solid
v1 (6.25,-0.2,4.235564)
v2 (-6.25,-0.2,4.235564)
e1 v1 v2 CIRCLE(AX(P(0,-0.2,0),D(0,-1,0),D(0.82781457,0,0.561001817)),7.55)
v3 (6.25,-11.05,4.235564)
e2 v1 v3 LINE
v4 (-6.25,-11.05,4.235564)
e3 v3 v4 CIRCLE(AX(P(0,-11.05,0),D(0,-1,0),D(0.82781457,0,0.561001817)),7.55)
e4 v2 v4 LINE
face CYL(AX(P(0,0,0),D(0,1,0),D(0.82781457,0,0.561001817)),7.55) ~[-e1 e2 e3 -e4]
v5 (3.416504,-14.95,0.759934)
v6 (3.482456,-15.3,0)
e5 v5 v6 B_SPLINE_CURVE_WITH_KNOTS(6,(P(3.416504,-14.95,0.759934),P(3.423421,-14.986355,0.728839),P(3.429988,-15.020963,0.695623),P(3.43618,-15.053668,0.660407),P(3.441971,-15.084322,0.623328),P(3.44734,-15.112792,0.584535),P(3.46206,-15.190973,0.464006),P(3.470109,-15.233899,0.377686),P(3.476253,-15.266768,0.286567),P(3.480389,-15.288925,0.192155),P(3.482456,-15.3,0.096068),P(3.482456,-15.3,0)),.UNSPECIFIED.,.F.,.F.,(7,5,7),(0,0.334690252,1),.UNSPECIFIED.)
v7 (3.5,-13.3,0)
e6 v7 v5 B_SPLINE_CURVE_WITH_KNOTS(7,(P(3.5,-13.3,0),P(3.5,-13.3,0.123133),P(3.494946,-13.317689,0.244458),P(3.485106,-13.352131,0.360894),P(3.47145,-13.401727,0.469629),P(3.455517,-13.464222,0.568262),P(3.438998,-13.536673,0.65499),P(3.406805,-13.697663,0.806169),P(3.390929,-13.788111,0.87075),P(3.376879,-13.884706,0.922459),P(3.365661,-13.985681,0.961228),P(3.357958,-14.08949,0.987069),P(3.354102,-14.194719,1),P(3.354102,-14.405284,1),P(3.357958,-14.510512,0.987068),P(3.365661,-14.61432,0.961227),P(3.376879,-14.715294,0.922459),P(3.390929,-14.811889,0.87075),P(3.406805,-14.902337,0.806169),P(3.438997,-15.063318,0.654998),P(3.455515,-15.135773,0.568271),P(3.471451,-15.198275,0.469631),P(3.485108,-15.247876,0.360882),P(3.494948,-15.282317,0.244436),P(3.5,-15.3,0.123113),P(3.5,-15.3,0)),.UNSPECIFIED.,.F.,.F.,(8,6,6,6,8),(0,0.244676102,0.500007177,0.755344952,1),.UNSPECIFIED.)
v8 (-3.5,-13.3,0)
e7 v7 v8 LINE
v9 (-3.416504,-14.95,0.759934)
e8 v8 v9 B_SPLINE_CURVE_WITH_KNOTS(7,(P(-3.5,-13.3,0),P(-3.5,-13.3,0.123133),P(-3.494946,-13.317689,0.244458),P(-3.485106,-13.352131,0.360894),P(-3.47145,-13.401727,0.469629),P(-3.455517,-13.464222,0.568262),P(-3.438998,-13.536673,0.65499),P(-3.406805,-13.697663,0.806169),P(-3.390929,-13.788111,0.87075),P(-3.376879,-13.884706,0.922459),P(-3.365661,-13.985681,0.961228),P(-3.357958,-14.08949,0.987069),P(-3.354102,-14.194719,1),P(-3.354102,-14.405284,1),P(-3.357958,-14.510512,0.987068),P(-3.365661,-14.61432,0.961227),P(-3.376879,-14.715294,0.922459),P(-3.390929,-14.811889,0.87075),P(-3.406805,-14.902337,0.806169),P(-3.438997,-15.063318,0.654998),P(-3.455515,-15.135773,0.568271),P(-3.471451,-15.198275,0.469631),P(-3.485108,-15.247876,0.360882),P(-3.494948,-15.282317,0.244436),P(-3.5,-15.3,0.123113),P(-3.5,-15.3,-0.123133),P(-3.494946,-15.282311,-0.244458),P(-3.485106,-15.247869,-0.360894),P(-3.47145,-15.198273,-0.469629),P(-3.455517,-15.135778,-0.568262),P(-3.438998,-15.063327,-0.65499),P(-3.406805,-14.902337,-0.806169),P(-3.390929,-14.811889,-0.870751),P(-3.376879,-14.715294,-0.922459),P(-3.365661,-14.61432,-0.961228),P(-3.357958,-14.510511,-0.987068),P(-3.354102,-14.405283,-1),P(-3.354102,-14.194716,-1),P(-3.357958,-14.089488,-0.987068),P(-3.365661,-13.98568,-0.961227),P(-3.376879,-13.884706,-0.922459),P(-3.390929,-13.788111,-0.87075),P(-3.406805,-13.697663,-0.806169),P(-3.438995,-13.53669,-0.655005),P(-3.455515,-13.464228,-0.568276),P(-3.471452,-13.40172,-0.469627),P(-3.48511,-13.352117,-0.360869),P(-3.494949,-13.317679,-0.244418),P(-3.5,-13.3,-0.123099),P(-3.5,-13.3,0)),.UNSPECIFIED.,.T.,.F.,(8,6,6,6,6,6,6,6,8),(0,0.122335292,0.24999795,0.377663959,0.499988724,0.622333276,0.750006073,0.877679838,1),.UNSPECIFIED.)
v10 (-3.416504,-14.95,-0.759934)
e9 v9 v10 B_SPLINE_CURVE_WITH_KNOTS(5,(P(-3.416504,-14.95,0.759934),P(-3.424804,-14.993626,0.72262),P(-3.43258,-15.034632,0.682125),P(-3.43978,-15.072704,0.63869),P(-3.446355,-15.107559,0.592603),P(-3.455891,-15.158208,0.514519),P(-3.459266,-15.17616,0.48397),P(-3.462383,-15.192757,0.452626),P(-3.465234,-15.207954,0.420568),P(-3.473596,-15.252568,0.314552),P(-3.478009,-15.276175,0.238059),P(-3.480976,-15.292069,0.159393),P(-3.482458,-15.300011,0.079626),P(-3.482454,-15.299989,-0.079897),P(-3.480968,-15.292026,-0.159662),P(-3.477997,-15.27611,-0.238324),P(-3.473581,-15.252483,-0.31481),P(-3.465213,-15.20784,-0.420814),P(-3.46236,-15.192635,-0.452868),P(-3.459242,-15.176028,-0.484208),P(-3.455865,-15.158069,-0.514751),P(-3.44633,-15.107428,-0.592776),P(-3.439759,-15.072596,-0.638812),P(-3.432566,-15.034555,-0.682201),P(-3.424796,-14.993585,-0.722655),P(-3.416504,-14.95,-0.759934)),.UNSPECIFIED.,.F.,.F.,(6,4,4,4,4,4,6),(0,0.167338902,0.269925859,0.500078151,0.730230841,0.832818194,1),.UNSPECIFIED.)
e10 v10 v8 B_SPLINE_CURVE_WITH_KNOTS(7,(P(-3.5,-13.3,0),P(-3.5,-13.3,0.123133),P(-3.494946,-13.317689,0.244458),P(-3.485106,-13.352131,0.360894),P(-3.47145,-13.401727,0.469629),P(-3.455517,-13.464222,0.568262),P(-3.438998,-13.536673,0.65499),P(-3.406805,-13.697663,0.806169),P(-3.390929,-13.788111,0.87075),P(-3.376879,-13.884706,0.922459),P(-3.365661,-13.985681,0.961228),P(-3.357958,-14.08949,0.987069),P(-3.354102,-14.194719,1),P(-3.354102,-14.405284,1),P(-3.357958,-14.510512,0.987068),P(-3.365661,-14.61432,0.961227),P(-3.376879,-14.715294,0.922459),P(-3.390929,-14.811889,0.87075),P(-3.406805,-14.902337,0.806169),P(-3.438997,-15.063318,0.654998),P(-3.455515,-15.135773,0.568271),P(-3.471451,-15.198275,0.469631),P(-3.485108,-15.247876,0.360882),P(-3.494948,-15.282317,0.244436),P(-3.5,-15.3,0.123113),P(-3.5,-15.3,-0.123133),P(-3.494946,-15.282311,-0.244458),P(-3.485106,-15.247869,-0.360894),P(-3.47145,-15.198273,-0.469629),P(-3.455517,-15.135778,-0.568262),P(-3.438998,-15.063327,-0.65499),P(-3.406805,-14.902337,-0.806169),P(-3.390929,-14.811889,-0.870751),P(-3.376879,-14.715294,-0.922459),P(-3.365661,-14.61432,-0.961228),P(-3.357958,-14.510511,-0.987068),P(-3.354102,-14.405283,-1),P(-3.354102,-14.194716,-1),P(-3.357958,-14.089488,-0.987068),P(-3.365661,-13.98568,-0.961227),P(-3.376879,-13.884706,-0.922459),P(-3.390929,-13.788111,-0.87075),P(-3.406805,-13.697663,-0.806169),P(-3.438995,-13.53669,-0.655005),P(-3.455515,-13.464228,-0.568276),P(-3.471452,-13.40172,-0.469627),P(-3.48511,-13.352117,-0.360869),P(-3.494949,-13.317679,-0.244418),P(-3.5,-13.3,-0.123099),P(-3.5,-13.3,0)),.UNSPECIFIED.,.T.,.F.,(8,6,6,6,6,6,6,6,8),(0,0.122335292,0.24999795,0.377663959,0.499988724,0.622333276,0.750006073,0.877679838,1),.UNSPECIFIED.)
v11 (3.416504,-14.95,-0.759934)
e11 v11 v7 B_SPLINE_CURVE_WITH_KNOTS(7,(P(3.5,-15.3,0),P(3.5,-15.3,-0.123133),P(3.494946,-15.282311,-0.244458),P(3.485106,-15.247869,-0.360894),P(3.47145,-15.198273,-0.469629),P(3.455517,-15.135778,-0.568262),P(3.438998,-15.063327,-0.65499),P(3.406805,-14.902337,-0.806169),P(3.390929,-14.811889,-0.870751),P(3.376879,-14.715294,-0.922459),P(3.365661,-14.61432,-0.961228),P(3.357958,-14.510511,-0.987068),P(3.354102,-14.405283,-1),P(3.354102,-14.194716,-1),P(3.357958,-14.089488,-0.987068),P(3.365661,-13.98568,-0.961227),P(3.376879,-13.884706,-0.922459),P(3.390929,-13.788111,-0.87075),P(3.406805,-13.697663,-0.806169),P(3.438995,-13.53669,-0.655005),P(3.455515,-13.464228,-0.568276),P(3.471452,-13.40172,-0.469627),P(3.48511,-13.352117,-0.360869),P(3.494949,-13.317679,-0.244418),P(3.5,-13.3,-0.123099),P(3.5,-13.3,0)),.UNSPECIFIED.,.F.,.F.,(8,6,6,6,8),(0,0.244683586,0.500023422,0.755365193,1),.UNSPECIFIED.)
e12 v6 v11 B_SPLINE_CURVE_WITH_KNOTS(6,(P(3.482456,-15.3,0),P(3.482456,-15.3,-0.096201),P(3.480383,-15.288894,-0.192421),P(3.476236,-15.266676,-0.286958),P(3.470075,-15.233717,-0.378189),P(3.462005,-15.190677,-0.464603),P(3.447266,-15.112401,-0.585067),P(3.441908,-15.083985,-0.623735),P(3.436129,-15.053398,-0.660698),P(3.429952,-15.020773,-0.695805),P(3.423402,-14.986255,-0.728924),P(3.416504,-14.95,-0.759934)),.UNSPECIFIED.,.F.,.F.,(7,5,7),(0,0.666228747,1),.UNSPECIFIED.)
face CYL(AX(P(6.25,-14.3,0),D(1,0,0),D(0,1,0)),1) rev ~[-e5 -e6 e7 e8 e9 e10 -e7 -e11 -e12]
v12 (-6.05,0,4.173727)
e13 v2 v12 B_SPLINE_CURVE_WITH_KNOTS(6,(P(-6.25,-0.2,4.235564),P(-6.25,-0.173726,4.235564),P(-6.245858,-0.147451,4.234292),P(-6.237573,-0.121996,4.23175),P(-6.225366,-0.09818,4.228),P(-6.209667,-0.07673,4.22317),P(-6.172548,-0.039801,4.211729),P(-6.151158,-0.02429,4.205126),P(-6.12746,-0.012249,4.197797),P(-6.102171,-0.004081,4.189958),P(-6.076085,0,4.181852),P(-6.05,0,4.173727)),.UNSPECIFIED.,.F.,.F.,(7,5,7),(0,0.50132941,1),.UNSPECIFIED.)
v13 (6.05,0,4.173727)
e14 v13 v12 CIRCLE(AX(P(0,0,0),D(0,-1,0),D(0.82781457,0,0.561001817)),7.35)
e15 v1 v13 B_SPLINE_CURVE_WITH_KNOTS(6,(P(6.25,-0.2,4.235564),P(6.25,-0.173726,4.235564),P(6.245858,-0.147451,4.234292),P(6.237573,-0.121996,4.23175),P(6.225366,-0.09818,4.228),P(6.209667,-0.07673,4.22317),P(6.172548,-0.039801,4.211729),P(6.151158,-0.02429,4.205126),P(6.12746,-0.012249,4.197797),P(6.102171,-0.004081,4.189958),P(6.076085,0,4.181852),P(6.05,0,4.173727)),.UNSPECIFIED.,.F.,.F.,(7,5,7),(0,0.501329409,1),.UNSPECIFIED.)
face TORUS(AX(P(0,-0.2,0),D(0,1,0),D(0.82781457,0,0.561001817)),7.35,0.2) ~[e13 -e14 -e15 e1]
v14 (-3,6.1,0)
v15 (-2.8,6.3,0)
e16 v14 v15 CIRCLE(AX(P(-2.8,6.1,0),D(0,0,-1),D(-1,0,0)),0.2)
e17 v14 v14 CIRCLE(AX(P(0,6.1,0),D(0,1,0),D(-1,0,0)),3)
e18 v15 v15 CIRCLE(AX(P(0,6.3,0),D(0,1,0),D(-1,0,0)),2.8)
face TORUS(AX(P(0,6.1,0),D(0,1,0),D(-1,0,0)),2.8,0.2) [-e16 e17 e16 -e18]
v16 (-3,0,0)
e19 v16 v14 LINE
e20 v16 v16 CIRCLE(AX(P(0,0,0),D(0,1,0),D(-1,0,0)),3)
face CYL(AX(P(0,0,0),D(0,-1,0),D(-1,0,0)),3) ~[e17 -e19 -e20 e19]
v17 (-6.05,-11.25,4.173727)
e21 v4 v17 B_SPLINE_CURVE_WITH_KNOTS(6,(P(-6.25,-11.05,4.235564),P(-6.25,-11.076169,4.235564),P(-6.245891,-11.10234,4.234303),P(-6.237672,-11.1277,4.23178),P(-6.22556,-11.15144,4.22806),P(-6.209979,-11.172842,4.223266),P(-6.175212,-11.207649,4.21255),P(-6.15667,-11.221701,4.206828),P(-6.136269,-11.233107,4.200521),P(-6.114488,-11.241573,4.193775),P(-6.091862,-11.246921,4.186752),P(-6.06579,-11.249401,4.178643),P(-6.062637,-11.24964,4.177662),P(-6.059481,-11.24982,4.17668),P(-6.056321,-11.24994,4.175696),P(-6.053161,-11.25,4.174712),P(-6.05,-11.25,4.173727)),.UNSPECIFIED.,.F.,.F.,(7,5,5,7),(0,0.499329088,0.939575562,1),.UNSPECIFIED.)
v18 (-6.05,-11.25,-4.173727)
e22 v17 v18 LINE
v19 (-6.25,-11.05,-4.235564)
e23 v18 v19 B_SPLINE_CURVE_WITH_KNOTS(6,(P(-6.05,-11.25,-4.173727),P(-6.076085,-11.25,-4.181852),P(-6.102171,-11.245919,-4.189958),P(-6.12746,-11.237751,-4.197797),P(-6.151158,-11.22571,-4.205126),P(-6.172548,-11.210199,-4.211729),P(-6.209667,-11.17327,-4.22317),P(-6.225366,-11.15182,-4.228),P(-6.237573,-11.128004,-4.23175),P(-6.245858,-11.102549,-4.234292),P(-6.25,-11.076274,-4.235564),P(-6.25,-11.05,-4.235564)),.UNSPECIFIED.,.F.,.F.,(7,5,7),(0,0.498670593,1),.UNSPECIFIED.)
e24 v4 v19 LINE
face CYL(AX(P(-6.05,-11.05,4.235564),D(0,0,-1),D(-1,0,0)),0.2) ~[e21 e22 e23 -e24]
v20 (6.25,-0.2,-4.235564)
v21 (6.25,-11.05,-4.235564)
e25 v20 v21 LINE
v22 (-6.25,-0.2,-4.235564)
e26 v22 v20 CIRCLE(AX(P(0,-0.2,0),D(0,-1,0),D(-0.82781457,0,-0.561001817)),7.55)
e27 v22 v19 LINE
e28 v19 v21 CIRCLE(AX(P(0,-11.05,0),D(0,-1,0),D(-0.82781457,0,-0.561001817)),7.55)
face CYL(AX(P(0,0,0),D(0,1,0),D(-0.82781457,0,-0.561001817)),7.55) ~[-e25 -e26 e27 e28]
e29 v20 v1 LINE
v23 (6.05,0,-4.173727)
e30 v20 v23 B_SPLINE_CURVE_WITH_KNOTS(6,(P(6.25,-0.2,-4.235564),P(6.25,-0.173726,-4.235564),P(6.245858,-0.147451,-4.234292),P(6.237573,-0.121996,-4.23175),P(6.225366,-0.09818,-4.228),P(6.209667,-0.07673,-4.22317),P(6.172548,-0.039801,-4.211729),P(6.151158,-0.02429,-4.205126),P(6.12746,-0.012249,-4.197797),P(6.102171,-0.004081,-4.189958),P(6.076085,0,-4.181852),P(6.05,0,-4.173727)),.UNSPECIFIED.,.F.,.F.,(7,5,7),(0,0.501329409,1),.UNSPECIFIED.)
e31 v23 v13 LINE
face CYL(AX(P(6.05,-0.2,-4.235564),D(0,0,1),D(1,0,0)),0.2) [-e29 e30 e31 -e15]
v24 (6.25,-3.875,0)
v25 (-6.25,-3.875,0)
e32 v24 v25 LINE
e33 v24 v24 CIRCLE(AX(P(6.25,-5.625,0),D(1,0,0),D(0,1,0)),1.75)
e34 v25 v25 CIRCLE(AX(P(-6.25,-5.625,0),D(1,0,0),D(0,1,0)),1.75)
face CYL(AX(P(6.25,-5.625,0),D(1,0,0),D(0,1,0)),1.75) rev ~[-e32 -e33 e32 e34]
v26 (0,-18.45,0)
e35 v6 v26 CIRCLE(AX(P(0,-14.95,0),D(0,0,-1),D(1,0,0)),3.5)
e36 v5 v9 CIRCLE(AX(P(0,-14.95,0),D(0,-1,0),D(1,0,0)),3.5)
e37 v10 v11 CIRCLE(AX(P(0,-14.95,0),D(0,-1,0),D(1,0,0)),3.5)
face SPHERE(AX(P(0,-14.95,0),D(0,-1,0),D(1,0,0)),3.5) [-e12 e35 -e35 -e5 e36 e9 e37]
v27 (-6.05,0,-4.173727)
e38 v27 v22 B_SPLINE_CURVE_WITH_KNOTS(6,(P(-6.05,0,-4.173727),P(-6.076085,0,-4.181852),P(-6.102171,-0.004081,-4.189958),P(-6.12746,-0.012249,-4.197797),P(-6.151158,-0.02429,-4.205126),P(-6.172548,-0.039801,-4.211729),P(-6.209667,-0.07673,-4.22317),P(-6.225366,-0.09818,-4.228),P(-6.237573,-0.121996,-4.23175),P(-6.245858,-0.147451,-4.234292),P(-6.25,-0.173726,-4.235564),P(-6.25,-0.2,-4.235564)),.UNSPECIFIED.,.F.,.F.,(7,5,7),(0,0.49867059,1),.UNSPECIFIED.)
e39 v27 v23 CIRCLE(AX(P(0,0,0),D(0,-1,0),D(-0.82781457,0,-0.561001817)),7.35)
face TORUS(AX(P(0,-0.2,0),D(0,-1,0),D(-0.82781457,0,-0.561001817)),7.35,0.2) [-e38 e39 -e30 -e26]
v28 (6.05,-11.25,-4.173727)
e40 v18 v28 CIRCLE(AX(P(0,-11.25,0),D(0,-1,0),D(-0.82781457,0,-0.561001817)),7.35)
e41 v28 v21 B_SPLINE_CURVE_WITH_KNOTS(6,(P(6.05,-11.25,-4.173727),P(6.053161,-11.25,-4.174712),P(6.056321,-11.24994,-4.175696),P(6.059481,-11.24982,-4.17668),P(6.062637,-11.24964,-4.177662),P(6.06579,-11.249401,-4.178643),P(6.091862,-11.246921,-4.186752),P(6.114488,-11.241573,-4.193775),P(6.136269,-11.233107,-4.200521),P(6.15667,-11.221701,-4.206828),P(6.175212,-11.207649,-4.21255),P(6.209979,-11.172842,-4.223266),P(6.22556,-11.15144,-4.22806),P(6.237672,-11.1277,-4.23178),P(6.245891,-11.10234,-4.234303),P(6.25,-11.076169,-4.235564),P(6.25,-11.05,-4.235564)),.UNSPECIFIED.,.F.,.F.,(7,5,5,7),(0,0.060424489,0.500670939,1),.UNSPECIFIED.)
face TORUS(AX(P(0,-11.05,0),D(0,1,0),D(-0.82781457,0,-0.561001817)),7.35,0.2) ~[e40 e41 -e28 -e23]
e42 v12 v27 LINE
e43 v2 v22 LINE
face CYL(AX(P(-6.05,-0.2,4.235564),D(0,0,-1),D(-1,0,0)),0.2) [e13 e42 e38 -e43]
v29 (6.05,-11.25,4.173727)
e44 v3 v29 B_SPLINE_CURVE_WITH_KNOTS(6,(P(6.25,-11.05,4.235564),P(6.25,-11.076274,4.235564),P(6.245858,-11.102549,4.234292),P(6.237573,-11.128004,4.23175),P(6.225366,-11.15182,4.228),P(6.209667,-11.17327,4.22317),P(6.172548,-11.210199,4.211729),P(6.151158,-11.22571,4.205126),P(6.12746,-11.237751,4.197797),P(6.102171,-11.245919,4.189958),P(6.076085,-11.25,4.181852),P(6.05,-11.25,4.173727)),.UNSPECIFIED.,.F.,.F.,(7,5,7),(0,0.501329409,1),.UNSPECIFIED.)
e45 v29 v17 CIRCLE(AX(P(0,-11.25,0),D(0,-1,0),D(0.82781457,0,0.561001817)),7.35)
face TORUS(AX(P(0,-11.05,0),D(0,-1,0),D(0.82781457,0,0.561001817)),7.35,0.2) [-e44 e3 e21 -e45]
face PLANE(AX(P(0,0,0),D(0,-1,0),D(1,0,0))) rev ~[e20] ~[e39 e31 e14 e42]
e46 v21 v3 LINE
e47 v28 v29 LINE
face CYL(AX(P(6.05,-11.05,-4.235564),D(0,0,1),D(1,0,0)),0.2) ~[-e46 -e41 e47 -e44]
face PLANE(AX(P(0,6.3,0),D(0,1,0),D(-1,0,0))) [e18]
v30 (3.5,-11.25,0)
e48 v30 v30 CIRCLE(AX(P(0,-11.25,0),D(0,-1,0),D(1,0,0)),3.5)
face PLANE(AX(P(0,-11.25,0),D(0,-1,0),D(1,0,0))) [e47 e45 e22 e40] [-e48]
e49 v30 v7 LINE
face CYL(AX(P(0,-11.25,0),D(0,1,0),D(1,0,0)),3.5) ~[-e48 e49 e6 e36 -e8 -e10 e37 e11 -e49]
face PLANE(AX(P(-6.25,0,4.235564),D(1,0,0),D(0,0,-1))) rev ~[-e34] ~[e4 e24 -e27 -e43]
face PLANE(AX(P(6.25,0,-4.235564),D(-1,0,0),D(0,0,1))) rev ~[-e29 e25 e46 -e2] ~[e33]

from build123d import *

# Parameters (mm, degrees)
F1_DEPTH = 11.25
F2_R     = 1.75
F3_DEPTH = 15
F4_R     = 3
F5_DEPTH = 6.3
F6_R     = 3.5
F7_DEPTH = 7.2
F8_R     = 1
F9_DEPTH = 15
F11_R    = 0.2


# Not quite as in the source:
# - a fillet or chamfer that OpenCascade refuses, or shapes differently, is made with other operations: its cross-section is extruded or revolved along the edge and cut away or added


with BuildPart() as f1:
    # F0 (on Front) → F1 (new body)
    with BuildSketch(Plane.XZ):
        with BuildLine():
            Line((6.25, 0), (6.25, 4.2355637169))
            ThreePointArc((6.25, 4.2355637169), (0, 7.55), (-6.25, 4.2355637169))
            Line((-6.25, 4.2355637169), (-6.25, -4.2355637169))
            ThreePointArc((-6.25, -4.2355637169), (0, -7.55), (6.25, -4.2355637169))
            Line((6.25, -4.2355637169), (6.25, 0))
        make_face()
    extrude(amount=F1_DEPTH)

    # F2 (on face) → F3 (cut)
    with BuildSketch(Plane.YZ.offset(6.25)):
        with Locations((-5.625, 0)):
            Circle(F2_R)
    extrude(amount=-F3_DEPTH, mode=Mode.SUBTRACT)

    # F4 (on face) → F5 (join)
    with BuildSketch(Plane(origin=(0, 0, 0), x_dir=(-1, 0, 0), z_dir=(0, 1, 0))):
        Circle(F4_R)
    extrude(amount=F5_DEPTH)

    # F6 (on face) → F7 (join)
    with BuildSketch(Plane.XZ.offset(11.25)):
        Circle(F6_R)
    extrude(amount=F7_DEPTH)

    # F8 (on face) → F9 (cut)
    with BuildSketch(Plane.YZ.offset(6.25)):
        with Locations((-14.3, 0)):
            Circle(F8_R)
    extrude(amount=-F9_DEPTH, mode=Mode.SUBTRACT)

    # F10: fillet of radius 3.5 on 1 edges, made by hand

    # F10_s1 → F10_t2 (revolve, cut)
    with BuildSketch(Plane.XY):
        with BuildLine():
            ThreePointArc((3.5, -14.95), (2.4748737342, -17.4248737342), (0, -18.45))
            Line((0, -18.45), (3.5, -18.45))
            Line((3.5, -18.45), (3.5, -14.95))
        make_face()
    revolve(axis=Axis((0, -18.45, 0), (0, -1, 0)), mode=Mode.SUBTRACT)

    # F11
    f11_edges = [f1.edges().sort_by_distance(p)[0] for p in [
        (3, 6.3, 0),
        (0, 0, 7.55),
        (6.25, 0, 0),
        (0, 0, -7.55),
        (-6.25, 0, 0),
        (0, -11.25, 7.55),
        (0, -11.25, -7.55),
        (-6.25, -11.25, 0),
        (6.25, -11.25, 0),
    ]]
    fillet(f11_edges, radius=F11_R)


solid = f1.part
